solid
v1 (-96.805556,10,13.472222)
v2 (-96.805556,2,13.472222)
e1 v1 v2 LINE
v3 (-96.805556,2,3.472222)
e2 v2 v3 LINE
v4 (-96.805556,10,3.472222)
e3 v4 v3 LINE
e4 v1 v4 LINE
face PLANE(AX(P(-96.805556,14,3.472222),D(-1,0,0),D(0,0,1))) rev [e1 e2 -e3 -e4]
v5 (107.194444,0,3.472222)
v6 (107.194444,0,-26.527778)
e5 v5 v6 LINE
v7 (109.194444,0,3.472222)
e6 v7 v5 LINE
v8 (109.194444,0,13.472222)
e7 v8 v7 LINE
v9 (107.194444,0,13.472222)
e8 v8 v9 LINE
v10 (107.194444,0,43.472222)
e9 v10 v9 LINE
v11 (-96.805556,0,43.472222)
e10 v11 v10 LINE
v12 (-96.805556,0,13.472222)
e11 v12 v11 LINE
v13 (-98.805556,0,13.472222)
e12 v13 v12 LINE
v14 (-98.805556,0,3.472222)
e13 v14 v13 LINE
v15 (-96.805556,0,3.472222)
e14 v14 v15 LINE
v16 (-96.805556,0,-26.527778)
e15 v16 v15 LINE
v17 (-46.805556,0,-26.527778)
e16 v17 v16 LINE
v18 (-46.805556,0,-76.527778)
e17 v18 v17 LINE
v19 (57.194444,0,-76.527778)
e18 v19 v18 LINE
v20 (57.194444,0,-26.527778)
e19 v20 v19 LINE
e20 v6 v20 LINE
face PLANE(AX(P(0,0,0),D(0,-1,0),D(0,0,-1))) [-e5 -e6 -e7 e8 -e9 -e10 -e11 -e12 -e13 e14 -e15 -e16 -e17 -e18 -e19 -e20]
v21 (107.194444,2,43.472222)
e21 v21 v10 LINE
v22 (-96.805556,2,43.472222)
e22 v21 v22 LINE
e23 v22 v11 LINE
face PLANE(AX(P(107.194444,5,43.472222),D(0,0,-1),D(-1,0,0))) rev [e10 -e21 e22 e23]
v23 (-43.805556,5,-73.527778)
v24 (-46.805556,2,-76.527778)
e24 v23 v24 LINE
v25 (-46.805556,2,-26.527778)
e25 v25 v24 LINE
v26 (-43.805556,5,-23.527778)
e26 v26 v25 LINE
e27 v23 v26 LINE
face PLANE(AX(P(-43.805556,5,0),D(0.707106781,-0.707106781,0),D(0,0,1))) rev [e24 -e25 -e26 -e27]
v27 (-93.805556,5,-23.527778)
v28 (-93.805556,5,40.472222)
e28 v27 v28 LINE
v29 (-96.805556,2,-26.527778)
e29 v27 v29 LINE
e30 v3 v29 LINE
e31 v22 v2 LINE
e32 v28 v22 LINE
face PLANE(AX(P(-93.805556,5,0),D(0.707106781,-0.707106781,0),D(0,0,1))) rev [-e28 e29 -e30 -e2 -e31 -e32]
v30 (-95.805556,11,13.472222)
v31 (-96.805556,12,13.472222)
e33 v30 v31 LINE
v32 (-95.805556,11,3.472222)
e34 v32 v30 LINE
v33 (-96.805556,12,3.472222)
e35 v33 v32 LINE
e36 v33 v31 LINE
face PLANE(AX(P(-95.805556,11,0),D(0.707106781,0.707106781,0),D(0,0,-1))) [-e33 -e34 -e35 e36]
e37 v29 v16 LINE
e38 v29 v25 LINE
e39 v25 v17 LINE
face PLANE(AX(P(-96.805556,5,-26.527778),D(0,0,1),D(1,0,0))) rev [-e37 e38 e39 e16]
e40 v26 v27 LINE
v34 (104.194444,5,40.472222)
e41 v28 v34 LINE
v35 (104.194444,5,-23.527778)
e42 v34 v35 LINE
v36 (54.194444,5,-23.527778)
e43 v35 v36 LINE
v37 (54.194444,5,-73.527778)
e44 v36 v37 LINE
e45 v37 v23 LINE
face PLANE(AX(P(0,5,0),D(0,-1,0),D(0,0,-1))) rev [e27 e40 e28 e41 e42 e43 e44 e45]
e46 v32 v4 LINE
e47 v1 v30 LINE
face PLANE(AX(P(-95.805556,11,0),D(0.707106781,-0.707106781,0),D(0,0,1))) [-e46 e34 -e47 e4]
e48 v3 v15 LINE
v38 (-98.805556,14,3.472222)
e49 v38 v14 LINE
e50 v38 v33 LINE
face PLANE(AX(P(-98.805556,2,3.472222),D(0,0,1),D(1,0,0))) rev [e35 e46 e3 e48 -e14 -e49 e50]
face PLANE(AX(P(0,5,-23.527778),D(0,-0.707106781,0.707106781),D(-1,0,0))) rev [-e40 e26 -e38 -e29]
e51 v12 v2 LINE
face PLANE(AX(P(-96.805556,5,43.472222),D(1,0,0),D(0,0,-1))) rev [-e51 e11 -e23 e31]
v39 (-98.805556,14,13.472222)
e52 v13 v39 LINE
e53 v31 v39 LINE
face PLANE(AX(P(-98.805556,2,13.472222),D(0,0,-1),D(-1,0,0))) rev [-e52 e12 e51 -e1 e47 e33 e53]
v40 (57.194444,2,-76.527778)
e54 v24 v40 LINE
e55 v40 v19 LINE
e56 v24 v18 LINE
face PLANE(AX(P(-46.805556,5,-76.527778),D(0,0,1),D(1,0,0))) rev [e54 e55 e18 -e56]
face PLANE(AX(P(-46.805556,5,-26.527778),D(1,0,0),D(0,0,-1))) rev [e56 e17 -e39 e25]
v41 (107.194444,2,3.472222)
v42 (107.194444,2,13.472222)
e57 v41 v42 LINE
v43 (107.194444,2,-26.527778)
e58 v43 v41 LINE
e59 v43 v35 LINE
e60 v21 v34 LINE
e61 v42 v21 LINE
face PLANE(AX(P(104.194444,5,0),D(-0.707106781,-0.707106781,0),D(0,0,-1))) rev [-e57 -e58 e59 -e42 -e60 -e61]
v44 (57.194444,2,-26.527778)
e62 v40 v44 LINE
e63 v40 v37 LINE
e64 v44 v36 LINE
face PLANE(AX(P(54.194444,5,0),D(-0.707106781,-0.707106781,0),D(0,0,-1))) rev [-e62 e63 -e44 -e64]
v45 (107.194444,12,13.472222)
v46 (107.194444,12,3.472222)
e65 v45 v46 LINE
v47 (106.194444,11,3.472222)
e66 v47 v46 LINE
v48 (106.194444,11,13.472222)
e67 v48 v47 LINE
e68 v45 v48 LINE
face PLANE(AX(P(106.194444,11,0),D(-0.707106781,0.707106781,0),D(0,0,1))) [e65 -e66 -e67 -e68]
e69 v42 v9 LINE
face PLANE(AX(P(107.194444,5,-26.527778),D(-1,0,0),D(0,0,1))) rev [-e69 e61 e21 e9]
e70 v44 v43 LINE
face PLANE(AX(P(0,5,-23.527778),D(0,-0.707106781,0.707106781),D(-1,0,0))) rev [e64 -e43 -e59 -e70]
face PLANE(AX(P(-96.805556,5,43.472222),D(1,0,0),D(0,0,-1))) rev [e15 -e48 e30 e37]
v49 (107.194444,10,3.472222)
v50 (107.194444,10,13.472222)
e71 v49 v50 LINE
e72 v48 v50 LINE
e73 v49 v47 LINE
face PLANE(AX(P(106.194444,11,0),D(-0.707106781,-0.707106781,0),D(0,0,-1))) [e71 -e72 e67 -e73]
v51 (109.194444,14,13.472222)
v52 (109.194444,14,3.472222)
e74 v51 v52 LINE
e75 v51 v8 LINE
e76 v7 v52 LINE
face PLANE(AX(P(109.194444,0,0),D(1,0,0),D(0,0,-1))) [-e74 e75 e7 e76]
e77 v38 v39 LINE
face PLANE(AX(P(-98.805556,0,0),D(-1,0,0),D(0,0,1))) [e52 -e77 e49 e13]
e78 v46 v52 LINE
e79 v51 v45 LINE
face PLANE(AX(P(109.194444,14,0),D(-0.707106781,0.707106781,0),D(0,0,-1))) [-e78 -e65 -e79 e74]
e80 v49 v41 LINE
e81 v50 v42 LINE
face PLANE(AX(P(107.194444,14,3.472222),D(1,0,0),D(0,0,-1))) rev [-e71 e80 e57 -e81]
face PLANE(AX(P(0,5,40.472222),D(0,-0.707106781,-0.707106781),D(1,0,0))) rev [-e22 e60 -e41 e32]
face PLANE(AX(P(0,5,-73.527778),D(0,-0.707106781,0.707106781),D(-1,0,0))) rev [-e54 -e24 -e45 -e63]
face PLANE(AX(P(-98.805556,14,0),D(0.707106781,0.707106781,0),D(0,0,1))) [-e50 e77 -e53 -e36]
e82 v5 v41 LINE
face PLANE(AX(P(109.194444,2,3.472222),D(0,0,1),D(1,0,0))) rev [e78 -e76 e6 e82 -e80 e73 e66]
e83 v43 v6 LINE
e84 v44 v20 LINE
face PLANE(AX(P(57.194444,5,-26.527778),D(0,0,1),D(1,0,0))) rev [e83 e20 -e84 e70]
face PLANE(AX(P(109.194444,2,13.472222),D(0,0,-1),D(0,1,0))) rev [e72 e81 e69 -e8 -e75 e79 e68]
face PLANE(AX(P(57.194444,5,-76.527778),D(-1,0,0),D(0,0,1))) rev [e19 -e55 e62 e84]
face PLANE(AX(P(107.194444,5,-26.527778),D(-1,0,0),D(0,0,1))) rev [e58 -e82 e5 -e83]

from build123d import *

# Parameters (mm, degrees)
BOSS_EXTRUDE1_DEPTH = 5
CHAMFER1_SIZE       = 3
SKETCH4_W           = 10
SKETCH4_H           = 2
BOSS_EXTRUDE3_DEPTH = 2
SKETCH5_W           = 2
SKETCH5_H           = 10
BOSS_EXTRUDE4_DEPTH = 12
CHAMFER2_SIZE       = 2
SKETCH6_W           = 10
SKETCH6_H           = 2
BOSS_EXTRUDE5_DEPTH = 1
CHAMFER3_SIZE       = 1
SKETCH7_W           = 10
SKETCH7_H           = 2
BOSS_EXTRUDE6_DEPTH = 2
SKETCH8_W           = 2
SKETCH8_H           = 10
BOSS_EXTRUDE7_DEPTH = 12
CHAMFER4_SIZE       = 2
SKETCH9_W           = 10
SKETCH9_H           = 2
BOSS_EXTRUDE8_DEPTH = 1
CHAMFER5_SIZE       = 1


with BuildPart() as part:
    # Sketch1 → Boss-Extrude1 (new body)
    with BuildSketch(Plane(origin=(0, 0, 0), x_dir=(1, 0, 0), z_dir=(0, 1, 0))):
        Polygon((-96.805555556, 26.527777778), (-46.805555556, 26.527777778), (-46.805555556, 76.527777778), (57.194444444, 76.527777778), (57.194444444, 26.527777778), (107.194444444, 26.527777778), (107.194444444, -43.472222222), (-96.805555556, -43.472222222), align=None)
    extrude(amount=BOSS_EXTRUDE1_DEPTH)

    # Chamfer1
    chamfer1_edges = [part.edges().sort_by_distance(p)[0] for p in [
        (107.194444444, 5, 8.472222222),
        (82.194444444, 5, -26.527777778),
        (57.194444444, 5, -51.527777778),
        (5.194444444, 5, -76.527777778),
        (-46.805555556, 5, -51.527777778),
        (-71.805555556, 5, -26.527777778),
        (-96.805555556, 5, 8.472222222),
        (5.194444444, 5, 43.472222222),
    ]]
    chamfer(chamfer1_edges, length=CHAMFER1_SIZE)

    # Sketch4 → Boss-Extrude3 (add)
    with BuildSketch(Plane(origin=(107.194444444, 0, 0), x_dir=(0, 0, -1), z_dir=(1, 0, 0))):
        with Locations((-8.472222222, 1)):
            Rectangle(SKETCH4_W, SKETCH4_H)
    extrude(amount=BOSS_EXTRUDE3_DEPTH)

    # Sketch5 → Boss-Extrude4 (add)
    with BuildSketch(Plane(origin=(0, 2, 0), x_dir=(1, 0, 0), z_dir=(0, 1, 0))):
        with Locations((108.194444444, -8.472222222)):
            Rectangle(SKETCH5_W, SKETCH5_H)
    extrude(amount=BOSS_EXTRUDE4_DEPTH)

    # Chamfer2
    chamfer2_edges = [part.edges().sort_by_distance(p)[0] for p in [
        (107.194444444, 14, 8.472222222),
    ]]
    chamfer(chamfer2_edges, length=CHAMFER2_SIZE - 0.0001)  # a hair under: the kernel refuses the full size

    # Sketch6 → Boss-Extrude5 (add)
    with BuildSketch(Plane.ZY.offset(-107.194444444)):
        with Locations((8.472222222, 11)):
            Rectangle(SKETCH6_W, SKETCH6_H)
    extrude(amount=BOSS_EXTRUDE5_DEPTH)

    # Chamfer3
    chamfer3_edges = [part.edges().sort_by_distance(p)[0] for p in [
        (106.194444444, 10, 8.472222222),
        (106.194444444, 12, 8.472222222),
    ]]
    chamfer(chamfer3_edges, length=CHAMFER3_SIZE - 0.0001)  # a hair under: the kernel refuses the full size

    # Sketch7 → Boss-Extrude6 (add)
    with BuildSketch(Plane.ZY.offset(96.805555556)):
        with Locations((8.472222222, 1)):
            Rectangle(SKETCH7_W, SKETCH7_H)
    extrude(amount=BOSS_EXTRUDE6_DEPTH)

    # Sketch8 → Boss-Extrude7 (add)
    with BuildSketch(Plane(origin=(0, 2, 0), x_dir=(1, 0, 0), z_dir=(0, 1, 0))):
        with Locations((-97.805555556, -8.472222222)):
            Rectangle(SKETCH8_W, SKETCH8_H)
    extrude(amount=BOSS_EXTRUDE7_DEPTH)

    # Chamfer4
    chamfer4_edges = [part.edges().sort_by_distance(p)[0] for p in [
        (-96.805555556, 14, 8.472222222),
    ]]
    chamfer(chamfer4_edges, length=CHAMFER4_SIZE - 0.0001)  # a hair under: the kernel refuses the full size

    # Sketch9 → Boss-Extrude8 (add)
    with BuildSketch(Plane(origin=(-96.805555556, 0, 0), x_dir=(0, 0, -1), z_dir=(1, 0, 0))):
        with Locations((-8.472222222, 11)):
            Rectangle(SKETCH9_W, SKETCH9_H)
    extrude(amount=BOSS_EXTRUDE8_DEPTH)

    # Chamfer5
    chamfer5_edges = [part.edges().sort_by_distance(p)[0] for p in [
        (-95.805555556, 10, 8.472222222),
        (-95.805555556, 12, 8.472222222),
    ]]
    chamfer(chamfer5_edges, length=CHAMFER5_SIZE - 0.0001)  # a hair under: the kernel refuses the full size


solid = part.part
